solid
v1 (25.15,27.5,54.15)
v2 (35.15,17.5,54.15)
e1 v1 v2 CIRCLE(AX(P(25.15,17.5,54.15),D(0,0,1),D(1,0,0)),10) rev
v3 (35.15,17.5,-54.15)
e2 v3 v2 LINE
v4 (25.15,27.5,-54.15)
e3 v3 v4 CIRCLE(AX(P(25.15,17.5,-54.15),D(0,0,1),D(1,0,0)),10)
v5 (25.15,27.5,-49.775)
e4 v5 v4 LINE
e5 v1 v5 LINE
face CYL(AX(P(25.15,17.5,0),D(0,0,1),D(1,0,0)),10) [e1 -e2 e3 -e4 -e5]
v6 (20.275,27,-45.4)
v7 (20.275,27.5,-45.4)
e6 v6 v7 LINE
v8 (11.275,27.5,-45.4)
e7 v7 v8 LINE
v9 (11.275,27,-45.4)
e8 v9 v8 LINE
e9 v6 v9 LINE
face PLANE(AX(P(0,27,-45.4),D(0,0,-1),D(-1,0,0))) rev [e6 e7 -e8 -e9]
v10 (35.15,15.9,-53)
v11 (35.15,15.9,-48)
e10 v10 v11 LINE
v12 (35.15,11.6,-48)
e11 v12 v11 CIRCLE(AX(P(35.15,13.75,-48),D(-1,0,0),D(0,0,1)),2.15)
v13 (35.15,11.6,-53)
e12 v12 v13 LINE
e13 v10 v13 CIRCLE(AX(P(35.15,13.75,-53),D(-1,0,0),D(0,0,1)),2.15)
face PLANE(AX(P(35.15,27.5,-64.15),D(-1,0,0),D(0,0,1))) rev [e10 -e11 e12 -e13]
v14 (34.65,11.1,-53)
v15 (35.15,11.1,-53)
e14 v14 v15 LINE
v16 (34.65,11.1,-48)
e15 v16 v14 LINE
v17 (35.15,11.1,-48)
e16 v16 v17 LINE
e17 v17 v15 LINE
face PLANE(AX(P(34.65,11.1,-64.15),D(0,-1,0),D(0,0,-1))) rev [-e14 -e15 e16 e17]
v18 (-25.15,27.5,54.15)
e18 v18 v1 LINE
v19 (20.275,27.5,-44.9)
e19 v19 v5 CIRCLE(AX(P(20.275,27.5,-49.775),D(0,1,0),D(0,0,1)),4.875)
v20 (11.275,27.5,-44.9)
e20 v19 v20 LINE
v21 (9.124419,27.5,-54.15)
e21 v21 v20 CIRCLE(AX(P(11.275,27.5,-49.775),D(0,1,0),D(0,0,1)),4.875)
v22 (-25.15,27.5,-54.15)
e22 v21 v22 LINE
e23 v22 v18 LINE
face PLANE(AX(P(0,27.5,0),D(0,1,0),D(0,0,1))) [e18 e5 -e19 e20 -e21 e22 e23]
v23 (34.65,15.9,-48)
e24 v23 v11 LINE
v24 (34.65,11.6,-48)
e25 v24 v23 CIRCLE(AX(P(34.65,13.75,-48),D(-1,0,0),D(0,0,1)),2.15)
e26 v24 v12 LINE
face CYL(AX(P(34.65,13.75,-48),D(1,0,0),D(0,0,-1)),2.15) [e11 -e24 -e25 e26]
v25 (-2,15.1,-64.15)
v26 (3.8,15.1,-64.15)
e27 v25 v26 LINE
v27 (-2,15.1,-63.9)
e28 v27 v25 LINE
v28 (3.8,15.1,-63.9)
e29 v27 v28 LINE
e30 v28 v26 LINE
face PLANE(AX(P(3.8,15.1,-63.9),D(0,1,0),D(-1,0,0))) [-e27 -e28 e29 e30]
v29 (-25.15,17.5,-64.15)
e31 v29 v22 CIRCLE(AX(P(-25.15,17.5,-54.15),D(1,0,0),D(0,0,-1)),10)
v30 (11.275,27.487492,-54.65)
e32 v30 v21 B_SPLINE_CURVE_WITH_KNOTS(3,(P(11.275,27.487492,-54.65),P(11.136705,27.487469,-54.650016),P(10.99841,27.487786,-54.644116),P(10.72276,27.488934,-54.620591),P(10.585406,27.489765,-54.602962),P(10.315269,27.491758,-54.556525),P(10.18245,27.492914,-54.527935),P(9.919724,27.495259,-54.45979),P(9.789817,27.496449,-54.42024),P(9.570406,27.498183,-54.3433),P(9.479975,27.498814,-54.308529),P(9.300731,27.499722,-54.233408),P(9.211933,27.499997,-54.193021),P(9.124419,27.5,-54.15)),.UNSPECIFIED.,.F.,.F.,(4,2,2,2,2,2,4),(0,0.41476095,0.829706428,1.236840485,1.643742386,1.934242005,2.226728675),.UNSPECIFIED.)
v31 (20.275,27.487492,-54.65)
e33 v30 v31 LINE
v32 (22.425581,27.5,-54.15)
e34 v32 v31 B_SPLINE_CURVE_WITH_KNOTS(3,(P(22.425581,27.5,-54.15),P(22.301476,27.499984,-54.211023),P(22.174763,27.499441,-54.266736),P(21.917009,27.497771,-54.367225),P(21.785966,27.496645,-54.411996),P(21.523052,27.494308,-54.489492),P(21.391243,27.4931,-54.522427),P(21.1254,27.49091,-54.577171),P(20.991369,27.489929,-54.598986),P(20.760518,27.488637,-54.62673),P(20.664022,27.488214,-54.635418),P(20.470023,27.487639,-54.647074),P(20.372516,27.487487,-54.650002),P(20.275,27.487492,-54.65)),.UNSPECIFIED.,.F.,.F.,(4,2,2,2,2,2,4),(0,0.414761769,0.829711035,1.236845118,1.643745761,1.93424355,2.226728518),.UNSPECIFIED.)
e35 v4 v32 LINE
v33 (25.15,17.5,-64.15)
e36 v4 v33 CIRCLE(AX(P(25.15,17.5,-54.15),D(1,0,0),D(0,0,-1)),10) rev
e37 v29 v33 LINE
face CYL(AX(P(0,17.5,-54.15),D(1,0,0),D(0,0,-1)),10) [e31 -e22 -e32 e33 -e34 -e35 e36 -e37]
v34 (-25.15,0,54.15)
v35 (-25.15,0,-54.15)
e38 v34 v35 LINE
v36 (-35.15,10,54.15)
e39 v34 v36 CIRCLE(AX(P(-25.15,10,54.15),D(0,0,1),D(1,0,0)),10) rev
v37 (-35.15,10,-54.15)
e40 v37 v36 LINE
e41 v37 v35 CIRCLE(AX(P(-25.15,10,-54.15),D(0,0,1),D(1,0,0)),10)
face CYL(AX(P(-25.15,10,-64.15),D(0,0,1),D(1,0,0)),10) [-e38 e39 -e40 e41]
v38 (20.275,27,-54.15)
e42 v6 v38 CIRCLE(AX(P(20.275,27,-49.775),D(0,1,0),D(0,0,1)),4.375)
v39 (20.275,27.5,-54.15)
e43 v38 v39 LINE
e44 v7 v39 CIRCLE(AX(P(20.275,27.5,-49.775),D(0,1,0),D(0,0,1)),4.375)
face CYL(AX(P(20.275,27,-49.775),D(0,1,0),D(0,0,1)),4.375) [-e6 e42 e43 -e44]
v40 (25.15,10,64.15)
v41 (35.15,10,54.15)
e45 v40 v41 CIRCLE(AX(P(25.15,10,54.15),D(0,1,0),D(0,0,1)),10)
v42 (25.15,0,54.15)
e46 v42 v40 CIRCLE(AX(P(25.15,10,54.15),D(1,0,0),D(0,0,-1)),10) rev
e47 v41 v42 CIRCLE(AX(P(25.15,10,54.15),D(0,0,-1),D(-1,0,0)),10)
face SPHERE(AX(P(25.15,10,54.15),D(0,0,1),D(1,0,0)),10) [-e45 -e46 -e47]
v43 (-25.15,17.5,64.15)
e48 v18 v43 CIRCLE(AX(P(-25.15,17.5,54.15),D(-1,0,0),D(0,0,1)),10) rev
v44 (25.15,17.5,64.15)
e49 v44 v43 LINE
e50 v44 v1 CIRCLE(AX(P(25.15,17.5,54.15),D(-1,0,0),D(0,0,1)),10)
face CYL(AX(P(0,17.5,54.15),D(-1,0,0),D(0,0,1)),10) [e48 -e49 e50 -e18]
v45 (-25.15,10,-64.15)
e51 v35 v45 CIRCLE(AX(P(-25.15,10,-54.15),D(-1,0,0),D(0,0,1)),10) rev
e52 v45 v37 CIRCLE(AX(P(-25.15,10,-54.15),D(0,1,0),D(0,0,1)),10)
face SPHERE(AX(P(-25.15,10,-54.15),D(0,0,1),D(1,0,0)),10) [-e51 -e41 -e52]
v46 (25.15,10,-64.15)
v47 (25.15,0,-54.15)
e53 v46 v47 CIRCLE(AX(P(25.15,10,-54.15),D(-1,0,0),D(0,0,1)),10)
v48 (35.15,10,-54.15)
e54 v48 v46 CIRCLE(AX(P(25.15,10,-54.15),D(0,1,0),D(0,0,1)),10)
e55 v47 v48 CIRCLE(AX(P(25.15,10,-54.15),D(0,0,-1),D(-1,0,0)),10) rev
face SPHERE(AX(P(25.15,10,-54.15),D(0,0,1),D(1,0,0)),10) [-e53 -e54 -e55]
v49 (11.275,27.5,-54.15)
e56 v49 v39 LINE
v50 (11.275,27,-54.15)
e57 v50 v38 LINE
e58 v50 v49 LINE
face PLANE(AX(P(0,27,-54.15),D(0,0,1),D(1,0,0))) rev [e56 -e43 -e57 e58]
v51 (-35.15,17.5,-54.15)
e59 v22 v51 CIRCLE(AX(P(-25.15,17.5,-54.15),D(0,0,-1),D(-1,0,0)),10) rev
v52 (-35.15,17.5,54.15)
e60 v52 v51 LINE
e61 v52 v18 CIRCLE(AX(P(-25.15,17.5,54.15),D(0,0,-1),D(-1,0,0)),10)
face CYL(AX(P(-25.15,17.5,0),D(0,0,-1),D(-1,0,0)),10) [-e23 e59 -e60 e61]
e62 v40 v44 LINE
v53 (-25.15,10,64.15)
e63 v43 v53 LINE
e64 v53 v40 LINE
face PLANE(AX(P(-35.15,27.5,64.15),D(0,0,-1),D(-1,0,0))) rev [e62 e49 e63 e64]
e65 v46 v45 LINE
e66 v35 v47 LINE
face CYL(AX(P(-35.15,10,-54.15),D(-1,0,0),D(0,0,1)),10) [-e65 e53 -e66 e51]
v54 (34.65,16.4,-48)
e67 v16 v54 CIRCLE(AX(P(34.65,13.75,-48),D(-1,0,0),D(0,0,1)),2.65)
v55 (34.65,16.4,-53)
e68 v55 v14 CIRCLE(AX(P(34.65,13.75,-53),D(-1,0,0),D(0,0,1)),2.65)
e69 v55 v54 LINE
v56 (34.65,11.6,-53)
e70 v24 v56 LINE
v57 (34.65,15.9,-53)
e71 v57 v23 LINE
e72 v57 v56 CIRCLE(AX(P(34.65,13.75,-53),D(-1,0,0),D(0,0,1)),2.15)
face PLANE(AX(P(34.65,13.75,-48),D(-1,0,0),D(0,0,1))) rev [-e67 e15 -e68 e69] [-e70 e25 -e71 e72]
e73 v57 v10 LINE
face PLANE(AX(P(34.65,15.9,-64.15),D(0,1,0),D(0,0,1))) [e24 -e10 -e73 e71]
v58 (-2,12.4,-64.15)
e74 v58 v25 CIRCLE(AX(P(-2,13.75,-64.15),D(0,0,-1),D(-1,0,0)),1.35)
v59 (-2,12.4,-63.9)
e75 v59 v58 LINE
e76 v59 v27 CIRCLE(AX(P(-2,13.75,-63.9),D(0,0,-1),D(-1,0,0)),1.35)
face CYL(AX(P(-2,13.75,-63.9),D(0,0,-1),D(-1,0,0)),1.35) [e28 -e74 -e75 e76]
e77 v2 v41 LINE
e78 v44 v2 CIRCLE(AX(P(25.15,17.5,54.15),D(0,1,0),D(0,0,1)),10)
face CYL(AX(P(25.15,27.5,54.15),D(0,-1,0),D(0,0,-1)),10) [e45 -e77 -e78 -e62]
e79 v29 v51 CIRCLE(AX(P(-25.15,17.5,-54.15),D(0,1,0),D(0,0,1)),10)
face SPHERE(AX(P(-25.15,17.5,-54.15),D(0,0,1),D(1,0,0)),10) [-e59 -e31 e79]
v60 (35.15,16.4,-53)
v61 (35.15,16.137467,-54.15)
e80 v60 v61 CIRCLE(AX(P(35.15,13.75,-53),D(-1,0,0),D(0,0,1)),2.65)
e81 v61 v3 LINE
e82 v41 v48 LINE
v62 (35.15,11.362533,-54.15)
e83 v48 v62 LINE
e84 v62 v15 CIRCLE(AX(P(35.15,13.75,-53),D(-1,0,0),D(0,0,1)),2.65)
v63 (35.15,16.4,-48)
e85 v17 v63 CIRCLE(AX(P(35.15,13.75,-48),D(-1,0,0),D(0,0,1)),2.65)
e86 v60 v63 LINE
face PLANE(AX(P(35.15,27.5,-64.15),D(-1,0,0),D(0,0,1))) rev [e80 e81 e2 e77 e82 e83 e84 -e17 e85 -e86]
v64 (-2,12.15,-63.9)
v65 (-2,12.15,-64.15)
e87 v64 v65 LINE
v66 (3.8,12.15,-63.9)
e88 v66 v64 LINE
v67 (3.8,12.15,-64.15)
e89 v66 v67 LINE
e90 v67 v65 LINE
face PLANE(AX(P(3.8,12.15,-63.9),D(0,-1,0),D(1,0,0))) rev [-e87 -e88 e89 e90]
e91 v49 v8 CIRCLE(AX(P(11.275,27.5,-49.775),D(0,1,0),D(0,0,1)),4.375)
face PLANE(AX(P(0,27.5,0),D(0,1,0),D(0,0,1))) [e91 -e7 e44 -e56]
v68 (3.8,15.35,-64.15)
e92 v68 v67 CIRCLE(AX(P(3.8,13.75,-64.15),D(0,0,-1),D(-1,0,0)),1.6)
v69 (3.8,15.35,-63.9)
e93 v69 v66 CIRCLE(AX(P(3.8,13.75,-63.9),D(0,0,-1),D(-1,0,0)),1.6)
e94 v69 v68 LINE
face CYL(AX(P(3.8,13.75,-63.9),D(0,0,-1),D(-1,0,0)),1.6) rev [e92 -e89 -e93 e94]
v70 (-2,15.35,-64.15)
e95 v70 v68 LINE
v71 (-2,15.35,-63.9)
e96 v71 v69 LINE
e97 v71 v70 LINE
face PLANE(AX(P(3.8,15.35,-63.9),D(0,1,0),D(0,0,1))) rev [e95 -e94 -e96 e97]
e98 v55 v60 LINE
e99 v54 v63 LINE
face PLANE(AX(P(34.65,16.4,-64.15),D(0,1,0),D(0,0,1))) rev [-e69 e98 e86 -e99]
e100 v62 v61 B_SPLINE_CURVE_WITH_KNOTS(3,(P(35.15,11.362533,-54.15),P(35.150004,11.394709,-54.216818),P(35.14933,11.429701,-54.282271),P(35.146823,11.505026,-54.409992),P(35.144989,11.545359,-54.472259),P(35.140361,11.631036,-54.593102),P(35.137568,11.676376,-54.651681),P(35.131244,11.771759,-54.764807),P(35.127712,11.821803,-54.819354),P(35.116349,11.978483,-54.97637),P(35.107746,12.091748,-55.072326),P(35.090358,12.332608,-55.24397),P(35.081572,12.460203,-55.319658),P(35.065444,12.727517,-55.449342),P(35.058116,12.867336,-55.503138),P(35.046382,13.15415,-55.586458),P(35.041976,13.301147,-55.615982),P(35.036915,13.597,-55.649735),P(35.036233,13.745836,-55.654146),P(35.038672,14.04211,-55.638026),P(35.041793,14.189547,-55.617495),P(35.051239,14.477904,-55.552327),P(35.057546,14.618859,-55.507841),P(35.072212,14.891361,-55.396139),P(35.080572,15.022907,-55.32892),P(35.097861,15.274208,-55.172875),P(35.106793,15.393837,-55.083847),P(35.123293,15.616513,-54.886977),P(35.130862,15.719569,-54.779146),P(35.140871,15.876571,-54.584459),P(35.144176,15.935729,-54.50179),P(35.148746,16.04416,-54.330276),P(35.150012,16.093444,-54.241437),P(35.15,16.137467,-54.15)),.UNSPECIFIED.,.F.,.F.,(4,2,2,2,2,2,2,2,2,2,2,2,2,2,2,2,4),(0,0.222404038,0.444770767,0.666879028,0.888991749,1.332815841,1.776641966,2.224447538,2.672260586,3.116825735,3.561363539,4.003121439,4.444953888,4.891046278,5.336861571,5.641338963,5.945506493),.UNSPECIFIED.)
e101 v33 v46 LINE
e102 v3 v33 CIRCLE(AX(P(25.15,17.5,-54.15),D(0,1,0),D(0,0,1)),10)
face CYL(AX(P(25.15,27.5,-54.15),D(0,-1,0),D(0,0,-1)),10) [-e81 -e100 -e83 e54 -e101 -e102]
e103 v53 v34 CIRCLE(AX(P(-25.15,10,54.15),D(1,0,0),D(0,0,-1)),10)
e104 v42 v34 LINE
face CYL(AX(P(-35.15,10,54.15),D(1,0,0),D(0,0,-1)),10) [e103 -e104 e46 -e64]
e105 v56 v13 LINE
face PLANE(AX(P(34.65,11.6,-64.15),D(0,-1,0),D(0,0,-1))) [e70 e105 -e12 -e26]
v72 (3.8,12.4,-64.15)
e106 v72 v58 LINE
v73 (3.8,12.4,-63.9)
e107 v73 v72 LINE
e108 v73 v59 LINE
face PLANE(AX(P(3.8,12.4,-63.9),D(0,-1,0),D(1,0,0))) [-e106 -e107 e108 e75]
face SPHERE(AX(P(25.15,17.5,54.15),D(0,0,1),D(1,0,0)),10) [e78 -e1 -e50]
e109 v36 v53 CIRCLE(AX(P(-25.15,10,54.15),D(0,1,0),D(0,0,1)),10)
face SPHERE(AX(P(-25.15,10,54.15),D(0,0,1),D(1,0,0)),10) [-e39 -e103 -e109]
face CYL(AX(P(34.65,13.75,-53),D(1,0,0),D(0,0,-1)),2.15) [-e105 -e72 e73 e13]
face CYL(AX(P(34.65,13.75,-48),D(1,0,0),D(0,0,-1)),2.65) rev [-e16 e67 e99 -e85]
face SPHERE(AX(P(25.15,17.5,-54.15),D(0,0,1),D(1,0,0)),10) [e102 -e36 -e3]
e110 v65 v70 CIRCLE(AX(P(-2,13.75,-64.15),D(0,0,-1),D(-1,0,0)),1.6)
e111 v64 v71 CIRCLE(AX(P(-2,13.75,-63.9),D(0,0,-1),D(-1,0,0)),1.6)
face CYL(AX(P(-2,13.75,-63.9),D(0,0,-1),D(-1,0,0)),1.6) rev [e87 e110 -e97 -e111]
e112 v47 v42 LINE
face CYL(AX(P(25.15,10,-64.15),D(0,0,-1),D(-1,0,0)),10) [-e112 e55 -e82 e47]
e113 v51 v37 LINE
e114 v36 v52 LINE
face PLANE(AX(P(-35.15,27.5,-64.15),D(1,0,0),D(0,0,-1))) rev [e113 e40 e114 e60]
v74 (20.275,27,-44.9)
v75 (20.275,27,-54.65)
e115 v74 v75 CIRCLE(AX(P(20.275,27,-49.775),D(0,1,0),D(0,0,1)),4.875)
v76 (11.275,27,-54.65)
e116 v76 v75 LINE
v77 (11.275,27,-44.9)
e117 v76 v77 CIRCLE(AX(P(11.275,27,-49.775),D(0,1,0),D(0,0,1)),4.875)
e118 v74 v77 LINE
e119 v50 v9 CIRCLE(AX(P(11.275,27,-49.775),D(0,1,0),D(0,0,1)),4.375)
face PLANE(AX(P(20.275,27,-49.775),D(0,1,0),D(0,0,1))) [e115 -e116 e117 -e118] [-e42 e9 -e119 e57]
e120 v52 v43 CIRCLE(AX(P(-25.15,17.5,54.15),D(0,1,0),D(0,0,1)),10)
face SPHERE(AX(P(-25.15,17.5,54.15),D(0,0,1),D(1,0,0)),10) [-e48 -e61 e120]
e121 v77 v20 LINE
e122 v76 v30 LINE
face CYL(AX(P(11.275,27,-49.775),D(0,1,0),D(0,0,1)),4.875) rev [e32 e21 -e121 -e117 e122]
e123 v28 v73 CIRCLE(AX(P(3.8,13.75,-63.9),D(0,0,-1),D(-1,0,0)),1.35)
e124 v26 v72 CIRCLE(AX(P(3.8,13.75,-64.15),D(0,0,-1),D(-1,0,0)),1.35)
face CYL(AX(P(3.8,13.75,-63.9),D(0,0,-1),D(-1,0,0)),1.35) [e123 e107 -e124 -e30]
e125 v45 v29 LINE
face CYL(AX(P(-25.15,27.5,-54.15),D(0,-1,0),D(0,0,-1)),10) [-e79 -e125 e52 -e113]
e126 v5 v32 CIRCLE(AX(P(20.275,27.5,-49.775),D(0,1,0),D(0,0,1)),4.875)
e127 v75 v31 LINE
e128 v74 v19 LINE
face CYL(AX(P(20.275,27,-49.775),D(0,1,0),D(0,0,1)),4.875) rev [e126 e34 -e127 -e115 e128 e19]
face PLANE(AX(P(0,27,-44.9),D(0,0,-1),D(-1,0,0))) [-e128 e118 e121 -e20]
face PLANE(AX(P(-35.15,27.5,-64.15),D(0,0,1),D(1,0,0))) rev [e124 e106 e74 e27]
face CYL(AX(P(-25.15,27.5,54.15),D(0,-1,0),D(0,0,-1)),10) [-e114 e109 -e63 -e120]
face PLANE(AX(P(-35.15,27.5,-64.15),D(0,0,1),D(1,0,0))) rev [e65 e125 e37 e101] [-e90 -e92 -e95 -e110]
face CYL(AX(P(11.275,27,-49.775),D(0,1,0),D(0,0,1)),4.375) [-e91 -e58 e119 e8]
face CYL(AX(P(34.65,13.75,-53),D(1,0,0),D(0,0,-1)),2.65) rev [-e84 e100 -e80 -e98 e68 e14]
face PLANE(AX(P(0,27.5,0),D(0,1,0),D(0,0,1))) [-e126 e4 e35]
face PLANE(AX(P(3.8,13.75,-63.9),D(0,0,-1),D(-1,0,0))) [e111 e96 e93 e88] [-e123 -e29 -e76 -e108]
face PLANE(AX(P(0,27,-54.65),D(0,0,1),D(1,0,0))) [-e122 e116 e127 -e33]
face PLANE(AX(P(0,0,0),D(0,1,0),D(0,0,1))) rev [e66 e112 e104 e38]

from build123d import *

# Parameters (mm, degrees)
SKETCH1_W           = 70.3
SKETCH1_H           = 128.3
BOSS_EXTRUDE1_DEPTH = 27.5
FILLET1_R           = 10
CUT_EXTRUDE1_START  = 35.15
CUT_EXTRUDE1_DEPTH  = 0.5
CUT_EXTRUDE2_DEPTH  = 0.5
FILLET2_R           = 10
CUT_EXTRUDE3_DEPTH  = 0.25


with BuildPart() as part:
    # Sketch1 → Boss-Extrude1 (new body)
    with BuildSketch(Plane(origin=(0, 0, 0), x_dir=(1, 0, 0), z_dir=(0, 1, 0))):
        Rectangle(SKETCH1_W, SKETCH1_H)
    extrude(amount=BOSS_EXTRUDE1_DEPTH)

    # Fillet1
    fillet1_edges = [part.edges().sort_by_distance(p)[0] for p in [
        (-35.15, 27.5, 0),
        (0, 27.5, 64.15),
        (35.15, 27.5, 0),
        (0, 0, 64.15),
        (-35.15, 0, 0),
        (0, 0, -64.15),
        (35.15, 0, 0),
        (0, 27.5, -64.15),
    ]]
    fillet(fillet1_edges, radius=FILLET1_R)

    # Sketch2 → Cut-Extrude1 (cut)
    with BuildSketch(Plane(origin=(0, 0, 0), x_dir=(0, 0, -1), z_dir=(1, 0, 0)).offset(CUT_EXTRUDE1_START)):
        with BuildLine():
            Line((48, 16.4), (53, 16.4))
            ThreePointArc((53, 16.4), (55.65, 13.75), (53, 11.1))
            Line((53, 11.1), (48, 11.1))
            ThreePointArc((48, 11.1), (45.35, 13.75), (48, 16.4))
        make_face()
        with BuildLine():
            Line((48, 15.9), (53, 15.9))
            ThreePointArc((53, 15.9), (55.15, 13.75), (53, 11.6))
            Line((53, 11.6), (48, 11.6))
            ThreePointArc((48, 11.6), (45.85, 13.75), (48, 15.9))
        make_face(mode=Mode.SUBTRACT)
    extrude(amount=-CUT_EXTRUDE1_DEPTH, mode=Mode.SUBTRACT)

    # Sketch3 → Cut-Extrude2 (cut)
    with BuildSketch(Plane(origin=(0, 27.5, 0), x_dir=(1, 0, 0), z_dir=(0, 1, 0))):
        with BuildLine():
            Line((11.275, 54.65), (20.275, 54.65))
            ThreePointArc((20.275, 54.65), (25.15, 49.775), (20.275, 44.9))
            Line((20.275, 44.9), (11.275, 44.9))
            ThreePointArc((11.275, 44.9), (6.4, 49.775), (11.275, 54.65))
        make_face()
        with BuildLine():
            Line((11.275, 54.15), (20.275, 54.15))
            ThreePointArc((20.275, 54.15), (24.65, 49.775), (20.275, 45.4))
            Line((20.275, 45.4), (11.275, 45.4))
            ThreePointArc((11.275, 45.4), (6.9, 49.775), (11.275, 54.15))
        make_face(mode=Mode.SUBTRACT)
    extrude(amount=-CUT_EXTRUDE2_DEPTH, mode=Mode.SUBTRACT)

    # Fillet2
    # the kernel refuses this fillet: 10 mm, written as the material it takes off along each edge
    with BuildSketch(Plane(origin=(25.15, 10, 54.15), x_dir=(0, 0, 1), z_dir=(1, 0, 0))) as fillet2_piece_1_section:
        Polygon((0, 0), (FILLET2_R * 1.02, 0), (FILLET2_R * 1.02, FILLET2_R * 1.02), (0, FILLET2_R * 1.02), align=None)
    fillet2_piece_1 = extrude(amount=FILLET2_R * 1.02, mode=Mode.PRIVATE)
    fillet2_piece_1 = fillet2_piece_1 - Plane(origin=(25.15, 10, 54.15), x_dir=(0, 0.7071067811865475, -0.7071067811865475), z_dir=(1, 0, 0)) * Sphere(FILLET2_R, mode=Mode.PRIVATE)
    add(fillet2_piece_1, mode=Mode.SUBTRACT)
    with BuildSketch(Plane(origin=(-25.15, 10, 54.15), x_dir=(0, 0, 1), z_dir=(-1, 0, 0))) as fillet2_piece_2_section:
        Polygon((0, 0), (FILLET2_R * 1.02, 0), (FILLET2_R * 1.02, -FILLET2_R * 1.02), (0, -FILLET2_R * 1.02), align=None)
    fillet2_piece_2 = extrude(amount=FILLET2_R * 1.02, mode=Mode.PRIVATE)
    fillet2_piece_2 = fillet2_piece_2 - Plane(origin=(-25.15, 10, 54.15), x_dir=(0, 0.7071067811865475, -0.7071067811865475), z_dir=(-1, 0, 0)) * Sphere(FILLET2_R, mode=Mode.PRIVATE)
    add(fillet2_piece_2, mode=Mode.SUBTRACT)
    with BuildSketch(Plane(origin=(25.15, 10, -54.15), x_dir=(1, 0, 0), z_dir=(0, 0, -1))) as fillet2_piece_3_section:
        Polygon((0, 0), (FILLET2_R * 1.02, 0), (FILLET2_R * 1.02, FILLET2_R * 1.02), (0, FILLET2_R * 1.02), align=None)
    fillet2_piece_3 = extrude(amount=FILLET2_R * 1.02, mode=Mode.PRIVATE)
    fillet2_piece_3 = fillet2_piece_3 - Plane(origin=(25.15, 10, -54.15), x_dir=(-0.7071067811865475, 0.7071067811865475, 0), z_dir=(0, 0, -1)) * Sphere(FILLET2_R, mode=Mode.PRIVATE)
    add(fillet2_piece_3, mode=Mode.SUBTRACT)
    with BuildSketch(Plane(origin=(-25.15, 10, -54.15), x_dir=(-1, 0, 0), z_dir=(0, 0, -1))) as fillet2_piece_4_section:
        Polygon((0, 0), (FILLET2_R * 1.02, 0), (FILLET2_R * 1.02, -FILLET2_R * 1.02), (0, -FILLET2_R * 1.02), align=None)
    fillet2_piece_4 = extrude(amount=FILLET2_R * 1.02, mode=Mode.PRIVATE)
    fillet2_piece_4 = fillet2_piece_4 - Plane(origin=(-25.15, 10, -54.15), x_dir=(0.7071067811865475, 0.7071067811865475, 0), z_dir=(0, 0, -1)) * Sphere(FILLET2_R, mode=Mode.PRIVATE)
    add(fillet2_piece_4, mode=Mode.SUBTRACT)
    with BuildSketch(Plane(origin=(-25.15, 17.5, -54.15), x_dir=(-1, 0, 0), z_dir=(0, 0, -1))) as fillet2_piece_5_section:
        Polygon((0, 0), (FILLET2_R * 1.02, 0), (FILLET2_R * 1.02, FILLET2_R * 1.02), (0, FILLET2_R * 1.02), align=None)
    fillet2_piece_5 = extrude(amount=FILLET2_R * 1.02, mode=Mode.PRIVATE)
    fillet2_piece_5 = fillet2_piece_5 - Plane(origin=(-25.15, 17.5, -54.15), x_dir=(0.7071067811865475, -0.7071067811865475, 0), z_dir=(0, 0, -1)) * Sphere(FILLET2_R, mode=Mode.PRIVATE)
    add(fillet2_piece_5, mode=Mode.SUBTRACT)
    with BuildSketch(Plane(origin=(25.15, 17.5, -54.15), x_dir=(1, 0, 0), z_dir=(0, 0, -1))) as fillet2_piece_6_section:
        Polygon((0, 0), (FILLET2_R * 1.02, 0), (FILLET2_R * 1.02, -FILLET2_R * 1.02), (0, -FILLET2_R * 1.02), align=None)
    fillet2_piece_6 = extrude(amount=FILLET2_R * 1.02, mode=Mode.PRIVATE)
    fillet2_piece_6 = fillet2_piece_6 - Plane(origin=(25.15, 17.5, -54.15), x_dir=(-0.7071067811865475, -0.7071067811865475, 0), z_dir=(0, 0, -1)) * Sphere(FILLET2_R, mode=Mode.PRIVATE)
    add(fillet2_piece_6, mode=Mode.SUBTRACT)
    with BuildSketch(Plane(origin=(-25.15, 17.5, 54.15), x_dir=(0, 0, 1), z_dir=(-1, 0, 0))) as fillet2_piece_7_section:
        Polygon((0, 0), (FILLET2_R * 1.02, 0), (FILLET2_R * 1.02, FILLET2_R * 1.02), (0, FILLET2_R * 1.02), align=None)
    fillet2_piece_7 = extrude(amount=FILLET2_R * 1.02, mode=Mode.PRIVATE)
    fillet2_piece_7 = fillet2_piece_7 - Plane(origin=(-25.15, 17.5, 54.15), x_dir=(0, -0.7071067811865475, -0.7071067811865475), z_dir=(-1, 0, 0)) * Sphere(FILLET2_R, mode=Mode.PRIVATE)
    add(fillet2_piece_7, mode=Mode.SUBTRACT)
    with BuildSketch(Plane(origin=(25.15, 17.5, 54.15), x_dir=(0, 0, 1), z_dir=(1, 0, 0))) as fillet2_piece_8_section:
        Polygon((0, 0), (FILLET2_R * 1.02, 0), (FILLET2_R * 1.02, -FILLET2_R * 1.02), (0, -FILLET2_R * 1.02), align=None)
    fillet2_piece_8 = extrude(amount=FILLET2_R * 1.02, mode=Mode.PRIVATE)
    fillet2_piece_8 = fillet2_piece_8 - Plane(origin=(25.15, 17.5, 54.15), x_dir=(0, -0.7071067811865475, -0.7071067811865475), z_dir=(1, 0, 0)) * Sphere(FILLET2_R, mode=Mode.PRIVATE)
    add(fillet2_piece_8, mode=Mode.SUBTRACT)
    with BuildSketch(Plane(origin=(-35.15, 10, -64.15), x_dir=(1, 0, 0), z_dir=(0, 1, 0)), Plane(origin=(-35.15, 10, 64.15), x_dir=(0, 0, -1), z_dir=(0, 1, 0))) as fillet2_piece_9:
        with BuildLine():
            CenterArc((FILLET2_R, -FILLET2_R), FILLET2_R, 90, 90)
            Line((0, -FILLET2_R), (0, 0))
            Line((0, 0), (FILLET2_R, 0))
        make_face()
    extrude(amount=7.5, mode=Mode.SUBTRACT)
    with BuildSketch(Plane(origin=(35.15, 10, -64.15), x_dir=(-1, 0, 0), z_dir=(0, 1, 0))) as fillet2_piece_10_section:
        with BuildLine():
            CenterArc((FILLET2_R, FILLET2_R), FILLET2_R, 180, 90)
            Line((0, FILLET2_R), (0, 0))
            Line((0, 0), (FILLET2_R, 0))
        make_face()
    fillet2_piece_10 = extrude(amount=7.5, mode=Mode.PRIVATE)
    fillet2_piece_10 = fillet2_piece_10 - Plane(origin=(30.454991339, 13.75, -53), x_dir=(0, 1, 0), z_dir=(1, 0, 0)) * Cylinder(2.15, 55, mode=Mode.PRIVATE)
    add(fillet2_piece_10, mode=Mode.SUBTRACT)
    with BuildSketch(Plane(origin=(35.15, 10, 64.15), x_dir=(0, 0, -1), z_dir=(0, 1, 0))) as fillet2_piece_11:
        with BuildLine():
            CenterArc((FILLET2_R, FILLET2_R), FILLET2_R, 180, 90)
            Line((0, FILLET2_R), (0, 0))
            Line((0, 0), (FILLET2_R, 0))
        make_face()
    extrude(amount=7.5, mode=Mode.SUBTRACT)

    # Sketch4 → Cut-Extrude3 (cut)
    with BuildSketch(Plane(origin=(0, 0, -64.15), x_dir=(-1, 0, 0), z_dir=(0, 0, -1))):
        with BuildLine():
            Line((-3.8, 15.35), (2, 15.35))
            ThreePointArc((2, 15.35), (3.6, 13.75), (2, 12.15))
            Line((2, 12.15), (-3.8, 12.15))
            ThreePointArc((-3.8, 12.15), (-5.4, 13.75), (-3.8, 15.35))
        make_face()
        with BuildLine():
            Line((-3.8, 15.1), (2, 15.1))
            ThreePointArc((2, 15.1), (3.35, 13.75), (2, 12.4))
            Line((2, 12.4), (-3.8, 12.4))
            ThreePointArc((-3.8, 12.4), (-5.15, 13.75), (-3.8, 15.1))
        make_face(mode=Mode.SUBTRACT)
    extrude(amount=-CUT_EXTRUDE3_DEPTH, mode=Mode.SUBTRACT)


solid = part.part
